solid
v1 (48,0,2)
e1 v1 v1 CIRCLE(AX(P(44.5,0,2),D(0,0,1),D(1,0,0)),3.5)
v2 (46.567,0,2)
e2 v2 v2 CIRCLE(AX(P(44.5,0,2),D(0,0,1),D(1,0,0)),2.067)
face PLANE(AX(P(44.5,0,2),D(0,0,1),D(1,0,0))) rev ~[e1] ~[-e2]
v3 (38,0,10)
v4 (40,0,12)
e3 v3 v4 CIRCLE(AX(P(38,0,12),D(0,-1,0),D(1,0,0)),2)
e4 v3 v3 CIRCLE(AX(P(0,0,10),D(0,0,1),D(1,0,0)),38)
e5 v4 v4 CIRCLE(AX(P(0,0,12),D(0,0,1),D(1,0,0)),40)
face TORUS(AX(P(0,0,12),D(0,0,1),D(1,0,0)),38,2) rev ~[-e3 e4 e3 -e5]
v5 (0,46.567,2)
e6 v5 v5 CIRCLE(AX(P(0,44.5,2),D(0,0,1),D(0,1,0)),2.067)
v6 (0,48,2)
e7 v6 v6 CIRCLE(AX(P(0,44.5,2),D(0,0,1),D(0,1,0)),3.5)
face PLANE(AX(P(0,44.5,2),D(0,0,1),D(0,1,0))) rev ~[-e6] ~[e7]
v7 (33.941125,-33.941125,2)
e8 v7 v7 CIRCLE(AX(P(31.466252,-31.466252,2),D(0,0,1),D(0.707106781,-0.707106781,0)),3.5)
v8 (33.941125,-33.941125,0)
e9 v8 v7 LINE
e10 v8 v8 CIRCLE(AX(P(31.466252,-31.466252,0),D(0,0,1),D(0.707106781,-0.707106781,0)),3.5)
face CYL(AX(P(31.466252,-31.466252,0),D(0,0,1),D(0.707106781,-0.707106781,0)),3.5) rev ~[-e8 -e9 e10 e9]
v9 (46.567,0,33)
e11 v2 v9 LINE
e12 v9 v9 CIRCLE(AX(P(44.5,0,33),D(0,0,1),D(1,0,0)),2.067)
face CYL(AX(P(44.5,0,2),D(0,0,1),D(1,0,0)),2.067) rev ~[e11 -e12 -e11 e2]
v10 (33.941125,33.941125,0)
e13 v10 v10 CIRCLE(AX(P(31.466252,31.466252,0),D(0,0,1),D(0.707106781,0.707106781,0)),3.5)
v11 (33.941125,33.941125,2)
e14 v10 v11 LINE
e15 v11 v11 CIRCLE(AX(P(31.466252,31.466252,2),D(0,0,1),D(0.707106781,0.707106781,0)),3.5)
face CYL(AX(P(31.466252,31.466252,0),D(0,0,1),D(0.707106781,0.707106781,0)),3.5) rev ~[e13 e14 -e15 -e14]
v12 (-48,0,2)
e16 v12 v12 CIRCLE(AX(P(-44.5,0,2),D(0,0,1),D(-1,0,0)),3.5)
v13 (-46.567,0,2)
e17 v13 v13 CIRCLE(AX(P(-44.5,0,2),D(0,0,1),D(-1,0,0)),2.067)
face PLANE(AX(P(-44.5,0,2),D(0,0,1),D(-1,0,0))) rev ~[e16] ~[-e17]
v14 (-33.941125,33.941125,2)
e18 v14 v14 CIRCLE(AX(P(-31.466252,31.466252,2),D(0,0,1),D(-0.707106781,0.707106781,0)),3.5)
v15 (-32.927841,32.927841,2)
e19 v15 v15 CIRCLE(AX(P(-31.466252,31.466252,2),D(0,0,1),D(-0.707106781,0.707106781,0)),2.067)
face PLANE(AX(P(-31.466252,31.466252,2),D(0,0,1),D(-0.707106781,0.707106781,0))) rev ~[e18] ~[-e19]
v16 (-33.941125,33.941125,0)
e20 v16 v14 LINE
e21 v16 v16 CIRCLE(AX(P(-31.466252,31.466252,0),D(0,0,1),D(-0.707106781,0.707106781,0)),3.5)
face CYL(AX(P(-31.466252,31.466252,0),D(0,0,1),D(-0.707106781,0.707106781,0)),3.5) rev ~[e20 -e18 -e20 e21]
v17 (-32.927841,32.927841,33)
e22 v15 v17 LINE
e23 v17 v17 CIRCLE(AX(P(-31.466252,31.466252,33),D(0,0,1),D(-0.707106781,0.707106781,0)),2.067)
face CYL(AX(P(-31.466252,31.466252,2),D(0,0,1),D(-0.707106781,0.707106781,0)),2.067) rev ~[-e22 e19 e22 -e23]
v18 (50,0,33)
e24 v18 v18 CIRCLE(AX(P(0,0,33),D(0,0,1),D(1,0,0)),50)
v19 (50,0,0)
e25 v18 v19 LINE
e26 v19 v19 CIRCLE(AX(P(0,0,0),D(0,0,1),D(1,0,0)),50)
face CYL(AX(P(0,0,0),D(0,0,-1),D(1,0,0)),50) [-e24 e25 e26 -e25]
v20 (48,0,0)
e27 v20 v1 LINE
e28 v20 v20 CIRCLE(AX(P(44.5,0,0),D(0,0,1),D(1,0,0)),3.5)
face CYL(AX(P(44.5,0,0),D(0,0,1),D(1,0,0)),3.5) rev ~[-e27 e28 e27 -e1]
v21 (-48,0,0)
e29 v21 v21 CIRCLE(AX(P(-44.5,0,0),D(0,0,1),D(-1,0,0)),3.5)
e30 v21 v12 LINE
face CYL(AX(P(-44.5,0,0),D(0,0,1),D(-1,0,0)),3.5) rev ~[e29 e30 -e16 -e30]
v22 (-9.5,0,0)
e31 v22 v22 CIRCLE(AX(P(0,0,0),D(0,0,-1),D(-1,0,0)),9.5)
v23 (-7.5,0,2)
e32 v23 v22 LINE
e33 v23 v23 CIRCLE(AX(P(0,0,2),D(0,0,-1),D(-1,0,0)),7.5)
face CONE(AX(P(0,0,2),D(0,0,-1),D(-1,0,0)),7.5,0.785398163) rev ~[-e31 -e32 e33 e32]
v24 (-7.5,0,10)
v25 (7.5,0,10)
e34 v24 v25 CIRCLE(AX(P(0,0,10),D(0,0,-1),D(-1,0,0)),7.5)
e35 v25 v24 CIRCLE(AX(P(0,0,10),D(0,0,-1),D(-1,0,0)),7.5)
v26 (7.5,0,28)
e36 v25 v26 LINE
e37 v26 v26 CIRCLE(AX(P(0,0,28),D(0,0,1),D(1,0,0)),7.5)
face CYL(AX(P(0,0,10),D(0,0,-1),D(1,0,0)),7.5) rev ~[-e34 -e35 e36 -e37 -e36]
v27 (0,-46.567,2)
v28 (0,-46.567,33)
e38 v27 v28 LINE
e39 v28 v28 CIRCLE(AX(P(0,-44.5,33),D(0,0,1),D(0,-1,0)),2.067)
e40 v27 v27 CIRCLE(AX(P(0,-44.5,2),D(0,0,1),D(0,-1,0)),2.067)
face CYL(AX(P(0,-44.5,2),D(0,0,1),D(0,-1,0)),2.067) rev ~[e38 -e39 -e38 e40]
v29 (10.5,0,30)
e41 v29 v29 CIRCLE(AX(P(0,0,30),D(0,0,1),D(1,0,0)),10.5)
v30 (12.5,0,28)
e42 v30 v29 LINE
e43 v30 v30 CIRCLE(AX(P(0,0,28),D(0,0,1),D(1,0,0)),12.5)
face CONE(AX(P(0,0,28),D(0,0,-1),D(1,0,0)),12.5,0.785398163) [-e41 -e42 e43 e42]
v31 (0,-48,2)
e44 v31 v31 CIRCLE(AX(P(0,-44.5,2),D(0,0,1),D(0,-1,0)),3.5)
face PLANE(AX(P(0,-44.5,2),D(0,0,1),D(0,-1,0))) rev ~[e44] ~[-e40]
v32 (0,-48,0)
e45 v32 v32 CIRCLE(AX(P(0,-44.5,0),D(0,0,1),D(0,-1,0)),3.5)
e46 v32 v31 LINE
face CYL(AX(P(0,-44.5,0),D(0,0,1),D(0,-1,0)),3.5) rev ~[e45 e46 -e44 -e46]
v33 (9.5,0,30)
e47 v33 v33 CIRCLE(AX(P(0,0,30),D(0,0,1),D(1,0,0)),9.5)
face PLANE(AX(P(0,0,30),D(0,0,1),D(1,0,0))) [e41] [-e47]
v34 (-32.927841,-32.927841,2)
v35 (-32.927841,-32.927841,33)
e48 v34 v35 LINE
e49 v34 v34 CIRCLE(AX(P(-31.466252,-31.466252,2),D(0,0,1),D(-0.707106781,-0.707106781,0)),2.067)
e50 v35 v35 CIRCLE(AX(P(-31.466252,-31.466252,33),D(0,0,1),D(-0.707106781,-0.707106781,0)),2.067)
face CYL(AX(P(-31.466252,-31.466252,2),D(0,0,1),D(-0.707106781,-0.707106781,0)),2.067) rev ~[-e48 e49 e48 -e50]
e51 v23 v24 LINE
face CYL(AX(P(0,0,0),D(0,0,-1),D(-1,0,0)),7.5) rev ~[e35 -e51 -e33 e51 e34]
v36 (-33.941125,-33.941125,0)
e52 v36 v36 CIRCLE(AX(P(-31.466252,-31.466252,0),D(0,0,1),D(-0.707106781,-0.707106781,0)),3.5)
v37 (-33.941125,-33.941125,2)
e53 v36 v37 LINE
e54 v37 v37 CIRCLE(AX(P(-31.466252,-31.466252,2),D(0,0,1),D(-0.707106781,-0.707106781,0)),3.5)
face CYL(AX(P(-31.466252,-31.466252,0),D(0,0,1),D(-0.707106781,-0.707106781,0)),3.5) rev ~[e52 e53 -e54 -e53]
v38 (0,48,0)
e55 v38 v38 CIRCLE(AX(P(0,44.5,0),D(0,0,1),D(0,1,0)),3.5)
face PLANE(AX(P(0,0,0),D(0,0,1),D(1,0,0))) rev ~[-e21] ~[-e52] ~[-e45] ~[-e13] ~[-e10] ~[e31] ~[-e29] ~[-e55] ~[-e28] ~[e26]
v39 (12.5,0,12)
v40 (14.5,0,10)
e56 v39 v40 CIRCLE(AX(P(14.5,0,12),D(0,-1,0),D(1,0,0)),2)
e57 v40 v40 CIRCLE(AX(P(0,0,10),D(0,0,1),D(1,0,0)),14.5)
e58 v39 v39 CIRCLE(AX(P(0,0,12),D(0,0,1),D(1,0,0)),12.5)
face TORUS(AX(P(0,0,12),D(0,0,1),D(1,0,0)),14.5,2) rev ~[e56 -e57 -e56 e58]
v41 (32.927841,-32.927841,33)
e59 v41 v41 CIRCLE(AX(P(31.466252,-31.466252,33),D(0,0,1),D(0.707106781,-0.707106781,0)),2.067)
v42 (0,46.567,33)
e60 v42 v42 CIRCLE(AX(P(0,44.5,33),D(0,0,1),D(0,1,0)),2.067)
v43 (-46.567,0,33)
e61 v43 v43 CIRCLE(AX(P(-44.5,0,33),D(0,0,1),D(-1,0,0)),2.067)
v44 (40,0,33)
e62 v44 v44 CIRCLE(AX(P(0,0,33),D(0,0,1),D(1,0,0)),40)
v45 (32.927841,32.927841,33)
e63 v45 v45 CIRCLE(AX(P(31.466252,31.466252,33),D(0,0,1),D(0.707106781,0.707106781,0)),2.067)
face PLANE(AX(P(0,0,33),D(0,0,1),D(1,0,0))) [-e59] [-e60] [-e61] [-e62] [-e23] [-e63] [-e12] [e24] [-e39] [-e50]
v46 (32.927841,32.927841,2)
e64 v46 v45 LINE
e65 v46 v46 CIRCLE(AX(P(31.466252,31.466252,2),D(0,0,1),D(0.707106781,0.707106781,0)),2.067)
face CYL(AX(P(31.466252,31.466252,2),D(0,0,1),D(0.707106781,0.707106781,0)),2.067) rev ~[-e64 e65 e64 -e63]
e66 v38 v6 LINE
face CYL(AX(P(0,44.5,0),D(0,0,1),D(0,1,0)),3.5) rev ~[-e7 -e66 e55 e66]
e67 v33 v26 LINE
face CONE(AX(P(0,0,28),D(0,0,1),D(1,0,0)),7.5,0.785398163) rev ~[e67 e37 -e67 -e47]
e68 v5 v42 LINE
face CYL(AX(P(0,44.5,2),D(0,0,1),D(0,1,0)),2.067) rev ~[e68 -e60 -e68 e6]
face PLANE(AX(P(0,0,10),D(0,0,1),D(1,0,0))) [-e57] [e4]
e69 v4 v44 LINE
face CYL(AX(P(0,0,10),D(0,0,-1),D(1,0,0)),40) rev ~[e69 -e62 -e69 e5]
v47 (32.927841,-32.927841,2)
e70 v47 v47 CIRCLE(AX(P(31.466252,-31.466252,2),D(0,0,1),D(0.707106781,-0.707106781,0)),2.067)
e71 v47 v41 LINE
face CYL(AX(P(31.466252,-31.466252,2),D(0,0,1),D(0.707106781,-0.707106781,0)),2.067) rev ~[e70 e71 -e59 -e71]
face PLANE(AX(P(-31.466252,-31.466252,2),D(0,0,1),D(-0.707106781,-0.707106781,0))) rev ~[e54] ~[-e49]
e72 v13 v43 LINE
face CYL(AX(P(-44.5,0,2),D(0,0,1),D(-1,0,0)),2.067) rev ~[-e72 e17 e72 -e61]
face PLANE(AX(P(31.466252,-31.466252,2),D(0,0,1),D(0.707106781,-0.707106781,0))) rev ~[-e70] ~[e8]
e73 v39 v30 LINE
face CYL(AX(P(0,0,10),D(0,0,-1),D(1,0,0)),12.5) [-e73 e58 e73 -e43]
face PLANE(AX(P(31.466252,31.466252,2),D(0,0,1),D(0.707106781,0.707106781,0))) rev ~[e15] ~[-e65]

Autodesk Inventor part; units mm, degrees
ref_plane "YZ Plane" through (0, 0, 0) normal (1, 0, 0) x (0, 1, 0)
ref_plane "XZ Plane" through (0, 0, 0) normal (0, 1, 0) x (-1, 0, 0)
ref_plane "XY Plane" through (0, 0, 0) normal (0, 0, 1) x (1, 0, 0)
sketch "Sketch1" plane through (0, 0, 0) normal (0, 0, 1) x (1, 0, 0)
  circle A0 centre (0, 0) radius 50
  point P0 (0, 44.5)
extrude "Extrusion1" add sketch "Sketch1" along normal blind 10
sketch "Sketch4" plane through (0, 0, 10) normal (0, 0, 1) x (1, 0, 0)
  circle A0 centre (0, 0) radius 40
  circle A1 centre (0, 0) radius 50 projected
  dimension "d20" = 80
extrude "Extrusion4" add sketch "Sketch4" along normal blind 23
hole "Hole2" at (0, 44.5, 0) direction (0, 0, 1) diameter 4.134 end through all counterbore diameter 7 counterbore depth 2 thread size "M5x0.8" class "6H" standard "ISO Metric profile"
pattern_circular "Circular Pattern2" count 8 over 360 about axis through (0, 0, -10) along (0, 0, 1) of "Hole2"
sketch "Sketch5" plane through (0, 0, 0) normal (0, 0, -1) x (-1, 0, 0)
  circle A0 centre (0, 0) radius 7.5
  dimension "d34" = 15
extrude "Extrusion5" cut sketch "Sketch5" against normal through all
sketch "Sketch6" plane through (0, 0, 0) normal (0, 0, -1) x (-1, 0, 0)
  circle A0 centre (0, 0) radius 7.5 projected
  circle A1 centre (0, 0) radius 50 projected
sketch "Sketch8" plane through (0, 0, 10) normal (0, 0, 1) x (1, 0, 0)
  circle A0 centre (0, 0) radius 12.5
  circle A1 centre (0, 0) radius 7.5 projected
  dimension "d50" = 25
extrude "Extrusion7" add sketch "Sketch8" along normal blind 20
chamfer "Chamfer1" distance 2 angle 45 2 edges at (-7.5, 0, 30) (-12.5, 0, 30)
fillet "Fillet1" radius 2 2 edges at (-12.5, 0, 10) (-40, 0, 10)
chamfer "Chamfer2" distance 2 angle 45 1 edges at (7.5, 0, 0)
properties part number "Cycloidal gear cover front"
